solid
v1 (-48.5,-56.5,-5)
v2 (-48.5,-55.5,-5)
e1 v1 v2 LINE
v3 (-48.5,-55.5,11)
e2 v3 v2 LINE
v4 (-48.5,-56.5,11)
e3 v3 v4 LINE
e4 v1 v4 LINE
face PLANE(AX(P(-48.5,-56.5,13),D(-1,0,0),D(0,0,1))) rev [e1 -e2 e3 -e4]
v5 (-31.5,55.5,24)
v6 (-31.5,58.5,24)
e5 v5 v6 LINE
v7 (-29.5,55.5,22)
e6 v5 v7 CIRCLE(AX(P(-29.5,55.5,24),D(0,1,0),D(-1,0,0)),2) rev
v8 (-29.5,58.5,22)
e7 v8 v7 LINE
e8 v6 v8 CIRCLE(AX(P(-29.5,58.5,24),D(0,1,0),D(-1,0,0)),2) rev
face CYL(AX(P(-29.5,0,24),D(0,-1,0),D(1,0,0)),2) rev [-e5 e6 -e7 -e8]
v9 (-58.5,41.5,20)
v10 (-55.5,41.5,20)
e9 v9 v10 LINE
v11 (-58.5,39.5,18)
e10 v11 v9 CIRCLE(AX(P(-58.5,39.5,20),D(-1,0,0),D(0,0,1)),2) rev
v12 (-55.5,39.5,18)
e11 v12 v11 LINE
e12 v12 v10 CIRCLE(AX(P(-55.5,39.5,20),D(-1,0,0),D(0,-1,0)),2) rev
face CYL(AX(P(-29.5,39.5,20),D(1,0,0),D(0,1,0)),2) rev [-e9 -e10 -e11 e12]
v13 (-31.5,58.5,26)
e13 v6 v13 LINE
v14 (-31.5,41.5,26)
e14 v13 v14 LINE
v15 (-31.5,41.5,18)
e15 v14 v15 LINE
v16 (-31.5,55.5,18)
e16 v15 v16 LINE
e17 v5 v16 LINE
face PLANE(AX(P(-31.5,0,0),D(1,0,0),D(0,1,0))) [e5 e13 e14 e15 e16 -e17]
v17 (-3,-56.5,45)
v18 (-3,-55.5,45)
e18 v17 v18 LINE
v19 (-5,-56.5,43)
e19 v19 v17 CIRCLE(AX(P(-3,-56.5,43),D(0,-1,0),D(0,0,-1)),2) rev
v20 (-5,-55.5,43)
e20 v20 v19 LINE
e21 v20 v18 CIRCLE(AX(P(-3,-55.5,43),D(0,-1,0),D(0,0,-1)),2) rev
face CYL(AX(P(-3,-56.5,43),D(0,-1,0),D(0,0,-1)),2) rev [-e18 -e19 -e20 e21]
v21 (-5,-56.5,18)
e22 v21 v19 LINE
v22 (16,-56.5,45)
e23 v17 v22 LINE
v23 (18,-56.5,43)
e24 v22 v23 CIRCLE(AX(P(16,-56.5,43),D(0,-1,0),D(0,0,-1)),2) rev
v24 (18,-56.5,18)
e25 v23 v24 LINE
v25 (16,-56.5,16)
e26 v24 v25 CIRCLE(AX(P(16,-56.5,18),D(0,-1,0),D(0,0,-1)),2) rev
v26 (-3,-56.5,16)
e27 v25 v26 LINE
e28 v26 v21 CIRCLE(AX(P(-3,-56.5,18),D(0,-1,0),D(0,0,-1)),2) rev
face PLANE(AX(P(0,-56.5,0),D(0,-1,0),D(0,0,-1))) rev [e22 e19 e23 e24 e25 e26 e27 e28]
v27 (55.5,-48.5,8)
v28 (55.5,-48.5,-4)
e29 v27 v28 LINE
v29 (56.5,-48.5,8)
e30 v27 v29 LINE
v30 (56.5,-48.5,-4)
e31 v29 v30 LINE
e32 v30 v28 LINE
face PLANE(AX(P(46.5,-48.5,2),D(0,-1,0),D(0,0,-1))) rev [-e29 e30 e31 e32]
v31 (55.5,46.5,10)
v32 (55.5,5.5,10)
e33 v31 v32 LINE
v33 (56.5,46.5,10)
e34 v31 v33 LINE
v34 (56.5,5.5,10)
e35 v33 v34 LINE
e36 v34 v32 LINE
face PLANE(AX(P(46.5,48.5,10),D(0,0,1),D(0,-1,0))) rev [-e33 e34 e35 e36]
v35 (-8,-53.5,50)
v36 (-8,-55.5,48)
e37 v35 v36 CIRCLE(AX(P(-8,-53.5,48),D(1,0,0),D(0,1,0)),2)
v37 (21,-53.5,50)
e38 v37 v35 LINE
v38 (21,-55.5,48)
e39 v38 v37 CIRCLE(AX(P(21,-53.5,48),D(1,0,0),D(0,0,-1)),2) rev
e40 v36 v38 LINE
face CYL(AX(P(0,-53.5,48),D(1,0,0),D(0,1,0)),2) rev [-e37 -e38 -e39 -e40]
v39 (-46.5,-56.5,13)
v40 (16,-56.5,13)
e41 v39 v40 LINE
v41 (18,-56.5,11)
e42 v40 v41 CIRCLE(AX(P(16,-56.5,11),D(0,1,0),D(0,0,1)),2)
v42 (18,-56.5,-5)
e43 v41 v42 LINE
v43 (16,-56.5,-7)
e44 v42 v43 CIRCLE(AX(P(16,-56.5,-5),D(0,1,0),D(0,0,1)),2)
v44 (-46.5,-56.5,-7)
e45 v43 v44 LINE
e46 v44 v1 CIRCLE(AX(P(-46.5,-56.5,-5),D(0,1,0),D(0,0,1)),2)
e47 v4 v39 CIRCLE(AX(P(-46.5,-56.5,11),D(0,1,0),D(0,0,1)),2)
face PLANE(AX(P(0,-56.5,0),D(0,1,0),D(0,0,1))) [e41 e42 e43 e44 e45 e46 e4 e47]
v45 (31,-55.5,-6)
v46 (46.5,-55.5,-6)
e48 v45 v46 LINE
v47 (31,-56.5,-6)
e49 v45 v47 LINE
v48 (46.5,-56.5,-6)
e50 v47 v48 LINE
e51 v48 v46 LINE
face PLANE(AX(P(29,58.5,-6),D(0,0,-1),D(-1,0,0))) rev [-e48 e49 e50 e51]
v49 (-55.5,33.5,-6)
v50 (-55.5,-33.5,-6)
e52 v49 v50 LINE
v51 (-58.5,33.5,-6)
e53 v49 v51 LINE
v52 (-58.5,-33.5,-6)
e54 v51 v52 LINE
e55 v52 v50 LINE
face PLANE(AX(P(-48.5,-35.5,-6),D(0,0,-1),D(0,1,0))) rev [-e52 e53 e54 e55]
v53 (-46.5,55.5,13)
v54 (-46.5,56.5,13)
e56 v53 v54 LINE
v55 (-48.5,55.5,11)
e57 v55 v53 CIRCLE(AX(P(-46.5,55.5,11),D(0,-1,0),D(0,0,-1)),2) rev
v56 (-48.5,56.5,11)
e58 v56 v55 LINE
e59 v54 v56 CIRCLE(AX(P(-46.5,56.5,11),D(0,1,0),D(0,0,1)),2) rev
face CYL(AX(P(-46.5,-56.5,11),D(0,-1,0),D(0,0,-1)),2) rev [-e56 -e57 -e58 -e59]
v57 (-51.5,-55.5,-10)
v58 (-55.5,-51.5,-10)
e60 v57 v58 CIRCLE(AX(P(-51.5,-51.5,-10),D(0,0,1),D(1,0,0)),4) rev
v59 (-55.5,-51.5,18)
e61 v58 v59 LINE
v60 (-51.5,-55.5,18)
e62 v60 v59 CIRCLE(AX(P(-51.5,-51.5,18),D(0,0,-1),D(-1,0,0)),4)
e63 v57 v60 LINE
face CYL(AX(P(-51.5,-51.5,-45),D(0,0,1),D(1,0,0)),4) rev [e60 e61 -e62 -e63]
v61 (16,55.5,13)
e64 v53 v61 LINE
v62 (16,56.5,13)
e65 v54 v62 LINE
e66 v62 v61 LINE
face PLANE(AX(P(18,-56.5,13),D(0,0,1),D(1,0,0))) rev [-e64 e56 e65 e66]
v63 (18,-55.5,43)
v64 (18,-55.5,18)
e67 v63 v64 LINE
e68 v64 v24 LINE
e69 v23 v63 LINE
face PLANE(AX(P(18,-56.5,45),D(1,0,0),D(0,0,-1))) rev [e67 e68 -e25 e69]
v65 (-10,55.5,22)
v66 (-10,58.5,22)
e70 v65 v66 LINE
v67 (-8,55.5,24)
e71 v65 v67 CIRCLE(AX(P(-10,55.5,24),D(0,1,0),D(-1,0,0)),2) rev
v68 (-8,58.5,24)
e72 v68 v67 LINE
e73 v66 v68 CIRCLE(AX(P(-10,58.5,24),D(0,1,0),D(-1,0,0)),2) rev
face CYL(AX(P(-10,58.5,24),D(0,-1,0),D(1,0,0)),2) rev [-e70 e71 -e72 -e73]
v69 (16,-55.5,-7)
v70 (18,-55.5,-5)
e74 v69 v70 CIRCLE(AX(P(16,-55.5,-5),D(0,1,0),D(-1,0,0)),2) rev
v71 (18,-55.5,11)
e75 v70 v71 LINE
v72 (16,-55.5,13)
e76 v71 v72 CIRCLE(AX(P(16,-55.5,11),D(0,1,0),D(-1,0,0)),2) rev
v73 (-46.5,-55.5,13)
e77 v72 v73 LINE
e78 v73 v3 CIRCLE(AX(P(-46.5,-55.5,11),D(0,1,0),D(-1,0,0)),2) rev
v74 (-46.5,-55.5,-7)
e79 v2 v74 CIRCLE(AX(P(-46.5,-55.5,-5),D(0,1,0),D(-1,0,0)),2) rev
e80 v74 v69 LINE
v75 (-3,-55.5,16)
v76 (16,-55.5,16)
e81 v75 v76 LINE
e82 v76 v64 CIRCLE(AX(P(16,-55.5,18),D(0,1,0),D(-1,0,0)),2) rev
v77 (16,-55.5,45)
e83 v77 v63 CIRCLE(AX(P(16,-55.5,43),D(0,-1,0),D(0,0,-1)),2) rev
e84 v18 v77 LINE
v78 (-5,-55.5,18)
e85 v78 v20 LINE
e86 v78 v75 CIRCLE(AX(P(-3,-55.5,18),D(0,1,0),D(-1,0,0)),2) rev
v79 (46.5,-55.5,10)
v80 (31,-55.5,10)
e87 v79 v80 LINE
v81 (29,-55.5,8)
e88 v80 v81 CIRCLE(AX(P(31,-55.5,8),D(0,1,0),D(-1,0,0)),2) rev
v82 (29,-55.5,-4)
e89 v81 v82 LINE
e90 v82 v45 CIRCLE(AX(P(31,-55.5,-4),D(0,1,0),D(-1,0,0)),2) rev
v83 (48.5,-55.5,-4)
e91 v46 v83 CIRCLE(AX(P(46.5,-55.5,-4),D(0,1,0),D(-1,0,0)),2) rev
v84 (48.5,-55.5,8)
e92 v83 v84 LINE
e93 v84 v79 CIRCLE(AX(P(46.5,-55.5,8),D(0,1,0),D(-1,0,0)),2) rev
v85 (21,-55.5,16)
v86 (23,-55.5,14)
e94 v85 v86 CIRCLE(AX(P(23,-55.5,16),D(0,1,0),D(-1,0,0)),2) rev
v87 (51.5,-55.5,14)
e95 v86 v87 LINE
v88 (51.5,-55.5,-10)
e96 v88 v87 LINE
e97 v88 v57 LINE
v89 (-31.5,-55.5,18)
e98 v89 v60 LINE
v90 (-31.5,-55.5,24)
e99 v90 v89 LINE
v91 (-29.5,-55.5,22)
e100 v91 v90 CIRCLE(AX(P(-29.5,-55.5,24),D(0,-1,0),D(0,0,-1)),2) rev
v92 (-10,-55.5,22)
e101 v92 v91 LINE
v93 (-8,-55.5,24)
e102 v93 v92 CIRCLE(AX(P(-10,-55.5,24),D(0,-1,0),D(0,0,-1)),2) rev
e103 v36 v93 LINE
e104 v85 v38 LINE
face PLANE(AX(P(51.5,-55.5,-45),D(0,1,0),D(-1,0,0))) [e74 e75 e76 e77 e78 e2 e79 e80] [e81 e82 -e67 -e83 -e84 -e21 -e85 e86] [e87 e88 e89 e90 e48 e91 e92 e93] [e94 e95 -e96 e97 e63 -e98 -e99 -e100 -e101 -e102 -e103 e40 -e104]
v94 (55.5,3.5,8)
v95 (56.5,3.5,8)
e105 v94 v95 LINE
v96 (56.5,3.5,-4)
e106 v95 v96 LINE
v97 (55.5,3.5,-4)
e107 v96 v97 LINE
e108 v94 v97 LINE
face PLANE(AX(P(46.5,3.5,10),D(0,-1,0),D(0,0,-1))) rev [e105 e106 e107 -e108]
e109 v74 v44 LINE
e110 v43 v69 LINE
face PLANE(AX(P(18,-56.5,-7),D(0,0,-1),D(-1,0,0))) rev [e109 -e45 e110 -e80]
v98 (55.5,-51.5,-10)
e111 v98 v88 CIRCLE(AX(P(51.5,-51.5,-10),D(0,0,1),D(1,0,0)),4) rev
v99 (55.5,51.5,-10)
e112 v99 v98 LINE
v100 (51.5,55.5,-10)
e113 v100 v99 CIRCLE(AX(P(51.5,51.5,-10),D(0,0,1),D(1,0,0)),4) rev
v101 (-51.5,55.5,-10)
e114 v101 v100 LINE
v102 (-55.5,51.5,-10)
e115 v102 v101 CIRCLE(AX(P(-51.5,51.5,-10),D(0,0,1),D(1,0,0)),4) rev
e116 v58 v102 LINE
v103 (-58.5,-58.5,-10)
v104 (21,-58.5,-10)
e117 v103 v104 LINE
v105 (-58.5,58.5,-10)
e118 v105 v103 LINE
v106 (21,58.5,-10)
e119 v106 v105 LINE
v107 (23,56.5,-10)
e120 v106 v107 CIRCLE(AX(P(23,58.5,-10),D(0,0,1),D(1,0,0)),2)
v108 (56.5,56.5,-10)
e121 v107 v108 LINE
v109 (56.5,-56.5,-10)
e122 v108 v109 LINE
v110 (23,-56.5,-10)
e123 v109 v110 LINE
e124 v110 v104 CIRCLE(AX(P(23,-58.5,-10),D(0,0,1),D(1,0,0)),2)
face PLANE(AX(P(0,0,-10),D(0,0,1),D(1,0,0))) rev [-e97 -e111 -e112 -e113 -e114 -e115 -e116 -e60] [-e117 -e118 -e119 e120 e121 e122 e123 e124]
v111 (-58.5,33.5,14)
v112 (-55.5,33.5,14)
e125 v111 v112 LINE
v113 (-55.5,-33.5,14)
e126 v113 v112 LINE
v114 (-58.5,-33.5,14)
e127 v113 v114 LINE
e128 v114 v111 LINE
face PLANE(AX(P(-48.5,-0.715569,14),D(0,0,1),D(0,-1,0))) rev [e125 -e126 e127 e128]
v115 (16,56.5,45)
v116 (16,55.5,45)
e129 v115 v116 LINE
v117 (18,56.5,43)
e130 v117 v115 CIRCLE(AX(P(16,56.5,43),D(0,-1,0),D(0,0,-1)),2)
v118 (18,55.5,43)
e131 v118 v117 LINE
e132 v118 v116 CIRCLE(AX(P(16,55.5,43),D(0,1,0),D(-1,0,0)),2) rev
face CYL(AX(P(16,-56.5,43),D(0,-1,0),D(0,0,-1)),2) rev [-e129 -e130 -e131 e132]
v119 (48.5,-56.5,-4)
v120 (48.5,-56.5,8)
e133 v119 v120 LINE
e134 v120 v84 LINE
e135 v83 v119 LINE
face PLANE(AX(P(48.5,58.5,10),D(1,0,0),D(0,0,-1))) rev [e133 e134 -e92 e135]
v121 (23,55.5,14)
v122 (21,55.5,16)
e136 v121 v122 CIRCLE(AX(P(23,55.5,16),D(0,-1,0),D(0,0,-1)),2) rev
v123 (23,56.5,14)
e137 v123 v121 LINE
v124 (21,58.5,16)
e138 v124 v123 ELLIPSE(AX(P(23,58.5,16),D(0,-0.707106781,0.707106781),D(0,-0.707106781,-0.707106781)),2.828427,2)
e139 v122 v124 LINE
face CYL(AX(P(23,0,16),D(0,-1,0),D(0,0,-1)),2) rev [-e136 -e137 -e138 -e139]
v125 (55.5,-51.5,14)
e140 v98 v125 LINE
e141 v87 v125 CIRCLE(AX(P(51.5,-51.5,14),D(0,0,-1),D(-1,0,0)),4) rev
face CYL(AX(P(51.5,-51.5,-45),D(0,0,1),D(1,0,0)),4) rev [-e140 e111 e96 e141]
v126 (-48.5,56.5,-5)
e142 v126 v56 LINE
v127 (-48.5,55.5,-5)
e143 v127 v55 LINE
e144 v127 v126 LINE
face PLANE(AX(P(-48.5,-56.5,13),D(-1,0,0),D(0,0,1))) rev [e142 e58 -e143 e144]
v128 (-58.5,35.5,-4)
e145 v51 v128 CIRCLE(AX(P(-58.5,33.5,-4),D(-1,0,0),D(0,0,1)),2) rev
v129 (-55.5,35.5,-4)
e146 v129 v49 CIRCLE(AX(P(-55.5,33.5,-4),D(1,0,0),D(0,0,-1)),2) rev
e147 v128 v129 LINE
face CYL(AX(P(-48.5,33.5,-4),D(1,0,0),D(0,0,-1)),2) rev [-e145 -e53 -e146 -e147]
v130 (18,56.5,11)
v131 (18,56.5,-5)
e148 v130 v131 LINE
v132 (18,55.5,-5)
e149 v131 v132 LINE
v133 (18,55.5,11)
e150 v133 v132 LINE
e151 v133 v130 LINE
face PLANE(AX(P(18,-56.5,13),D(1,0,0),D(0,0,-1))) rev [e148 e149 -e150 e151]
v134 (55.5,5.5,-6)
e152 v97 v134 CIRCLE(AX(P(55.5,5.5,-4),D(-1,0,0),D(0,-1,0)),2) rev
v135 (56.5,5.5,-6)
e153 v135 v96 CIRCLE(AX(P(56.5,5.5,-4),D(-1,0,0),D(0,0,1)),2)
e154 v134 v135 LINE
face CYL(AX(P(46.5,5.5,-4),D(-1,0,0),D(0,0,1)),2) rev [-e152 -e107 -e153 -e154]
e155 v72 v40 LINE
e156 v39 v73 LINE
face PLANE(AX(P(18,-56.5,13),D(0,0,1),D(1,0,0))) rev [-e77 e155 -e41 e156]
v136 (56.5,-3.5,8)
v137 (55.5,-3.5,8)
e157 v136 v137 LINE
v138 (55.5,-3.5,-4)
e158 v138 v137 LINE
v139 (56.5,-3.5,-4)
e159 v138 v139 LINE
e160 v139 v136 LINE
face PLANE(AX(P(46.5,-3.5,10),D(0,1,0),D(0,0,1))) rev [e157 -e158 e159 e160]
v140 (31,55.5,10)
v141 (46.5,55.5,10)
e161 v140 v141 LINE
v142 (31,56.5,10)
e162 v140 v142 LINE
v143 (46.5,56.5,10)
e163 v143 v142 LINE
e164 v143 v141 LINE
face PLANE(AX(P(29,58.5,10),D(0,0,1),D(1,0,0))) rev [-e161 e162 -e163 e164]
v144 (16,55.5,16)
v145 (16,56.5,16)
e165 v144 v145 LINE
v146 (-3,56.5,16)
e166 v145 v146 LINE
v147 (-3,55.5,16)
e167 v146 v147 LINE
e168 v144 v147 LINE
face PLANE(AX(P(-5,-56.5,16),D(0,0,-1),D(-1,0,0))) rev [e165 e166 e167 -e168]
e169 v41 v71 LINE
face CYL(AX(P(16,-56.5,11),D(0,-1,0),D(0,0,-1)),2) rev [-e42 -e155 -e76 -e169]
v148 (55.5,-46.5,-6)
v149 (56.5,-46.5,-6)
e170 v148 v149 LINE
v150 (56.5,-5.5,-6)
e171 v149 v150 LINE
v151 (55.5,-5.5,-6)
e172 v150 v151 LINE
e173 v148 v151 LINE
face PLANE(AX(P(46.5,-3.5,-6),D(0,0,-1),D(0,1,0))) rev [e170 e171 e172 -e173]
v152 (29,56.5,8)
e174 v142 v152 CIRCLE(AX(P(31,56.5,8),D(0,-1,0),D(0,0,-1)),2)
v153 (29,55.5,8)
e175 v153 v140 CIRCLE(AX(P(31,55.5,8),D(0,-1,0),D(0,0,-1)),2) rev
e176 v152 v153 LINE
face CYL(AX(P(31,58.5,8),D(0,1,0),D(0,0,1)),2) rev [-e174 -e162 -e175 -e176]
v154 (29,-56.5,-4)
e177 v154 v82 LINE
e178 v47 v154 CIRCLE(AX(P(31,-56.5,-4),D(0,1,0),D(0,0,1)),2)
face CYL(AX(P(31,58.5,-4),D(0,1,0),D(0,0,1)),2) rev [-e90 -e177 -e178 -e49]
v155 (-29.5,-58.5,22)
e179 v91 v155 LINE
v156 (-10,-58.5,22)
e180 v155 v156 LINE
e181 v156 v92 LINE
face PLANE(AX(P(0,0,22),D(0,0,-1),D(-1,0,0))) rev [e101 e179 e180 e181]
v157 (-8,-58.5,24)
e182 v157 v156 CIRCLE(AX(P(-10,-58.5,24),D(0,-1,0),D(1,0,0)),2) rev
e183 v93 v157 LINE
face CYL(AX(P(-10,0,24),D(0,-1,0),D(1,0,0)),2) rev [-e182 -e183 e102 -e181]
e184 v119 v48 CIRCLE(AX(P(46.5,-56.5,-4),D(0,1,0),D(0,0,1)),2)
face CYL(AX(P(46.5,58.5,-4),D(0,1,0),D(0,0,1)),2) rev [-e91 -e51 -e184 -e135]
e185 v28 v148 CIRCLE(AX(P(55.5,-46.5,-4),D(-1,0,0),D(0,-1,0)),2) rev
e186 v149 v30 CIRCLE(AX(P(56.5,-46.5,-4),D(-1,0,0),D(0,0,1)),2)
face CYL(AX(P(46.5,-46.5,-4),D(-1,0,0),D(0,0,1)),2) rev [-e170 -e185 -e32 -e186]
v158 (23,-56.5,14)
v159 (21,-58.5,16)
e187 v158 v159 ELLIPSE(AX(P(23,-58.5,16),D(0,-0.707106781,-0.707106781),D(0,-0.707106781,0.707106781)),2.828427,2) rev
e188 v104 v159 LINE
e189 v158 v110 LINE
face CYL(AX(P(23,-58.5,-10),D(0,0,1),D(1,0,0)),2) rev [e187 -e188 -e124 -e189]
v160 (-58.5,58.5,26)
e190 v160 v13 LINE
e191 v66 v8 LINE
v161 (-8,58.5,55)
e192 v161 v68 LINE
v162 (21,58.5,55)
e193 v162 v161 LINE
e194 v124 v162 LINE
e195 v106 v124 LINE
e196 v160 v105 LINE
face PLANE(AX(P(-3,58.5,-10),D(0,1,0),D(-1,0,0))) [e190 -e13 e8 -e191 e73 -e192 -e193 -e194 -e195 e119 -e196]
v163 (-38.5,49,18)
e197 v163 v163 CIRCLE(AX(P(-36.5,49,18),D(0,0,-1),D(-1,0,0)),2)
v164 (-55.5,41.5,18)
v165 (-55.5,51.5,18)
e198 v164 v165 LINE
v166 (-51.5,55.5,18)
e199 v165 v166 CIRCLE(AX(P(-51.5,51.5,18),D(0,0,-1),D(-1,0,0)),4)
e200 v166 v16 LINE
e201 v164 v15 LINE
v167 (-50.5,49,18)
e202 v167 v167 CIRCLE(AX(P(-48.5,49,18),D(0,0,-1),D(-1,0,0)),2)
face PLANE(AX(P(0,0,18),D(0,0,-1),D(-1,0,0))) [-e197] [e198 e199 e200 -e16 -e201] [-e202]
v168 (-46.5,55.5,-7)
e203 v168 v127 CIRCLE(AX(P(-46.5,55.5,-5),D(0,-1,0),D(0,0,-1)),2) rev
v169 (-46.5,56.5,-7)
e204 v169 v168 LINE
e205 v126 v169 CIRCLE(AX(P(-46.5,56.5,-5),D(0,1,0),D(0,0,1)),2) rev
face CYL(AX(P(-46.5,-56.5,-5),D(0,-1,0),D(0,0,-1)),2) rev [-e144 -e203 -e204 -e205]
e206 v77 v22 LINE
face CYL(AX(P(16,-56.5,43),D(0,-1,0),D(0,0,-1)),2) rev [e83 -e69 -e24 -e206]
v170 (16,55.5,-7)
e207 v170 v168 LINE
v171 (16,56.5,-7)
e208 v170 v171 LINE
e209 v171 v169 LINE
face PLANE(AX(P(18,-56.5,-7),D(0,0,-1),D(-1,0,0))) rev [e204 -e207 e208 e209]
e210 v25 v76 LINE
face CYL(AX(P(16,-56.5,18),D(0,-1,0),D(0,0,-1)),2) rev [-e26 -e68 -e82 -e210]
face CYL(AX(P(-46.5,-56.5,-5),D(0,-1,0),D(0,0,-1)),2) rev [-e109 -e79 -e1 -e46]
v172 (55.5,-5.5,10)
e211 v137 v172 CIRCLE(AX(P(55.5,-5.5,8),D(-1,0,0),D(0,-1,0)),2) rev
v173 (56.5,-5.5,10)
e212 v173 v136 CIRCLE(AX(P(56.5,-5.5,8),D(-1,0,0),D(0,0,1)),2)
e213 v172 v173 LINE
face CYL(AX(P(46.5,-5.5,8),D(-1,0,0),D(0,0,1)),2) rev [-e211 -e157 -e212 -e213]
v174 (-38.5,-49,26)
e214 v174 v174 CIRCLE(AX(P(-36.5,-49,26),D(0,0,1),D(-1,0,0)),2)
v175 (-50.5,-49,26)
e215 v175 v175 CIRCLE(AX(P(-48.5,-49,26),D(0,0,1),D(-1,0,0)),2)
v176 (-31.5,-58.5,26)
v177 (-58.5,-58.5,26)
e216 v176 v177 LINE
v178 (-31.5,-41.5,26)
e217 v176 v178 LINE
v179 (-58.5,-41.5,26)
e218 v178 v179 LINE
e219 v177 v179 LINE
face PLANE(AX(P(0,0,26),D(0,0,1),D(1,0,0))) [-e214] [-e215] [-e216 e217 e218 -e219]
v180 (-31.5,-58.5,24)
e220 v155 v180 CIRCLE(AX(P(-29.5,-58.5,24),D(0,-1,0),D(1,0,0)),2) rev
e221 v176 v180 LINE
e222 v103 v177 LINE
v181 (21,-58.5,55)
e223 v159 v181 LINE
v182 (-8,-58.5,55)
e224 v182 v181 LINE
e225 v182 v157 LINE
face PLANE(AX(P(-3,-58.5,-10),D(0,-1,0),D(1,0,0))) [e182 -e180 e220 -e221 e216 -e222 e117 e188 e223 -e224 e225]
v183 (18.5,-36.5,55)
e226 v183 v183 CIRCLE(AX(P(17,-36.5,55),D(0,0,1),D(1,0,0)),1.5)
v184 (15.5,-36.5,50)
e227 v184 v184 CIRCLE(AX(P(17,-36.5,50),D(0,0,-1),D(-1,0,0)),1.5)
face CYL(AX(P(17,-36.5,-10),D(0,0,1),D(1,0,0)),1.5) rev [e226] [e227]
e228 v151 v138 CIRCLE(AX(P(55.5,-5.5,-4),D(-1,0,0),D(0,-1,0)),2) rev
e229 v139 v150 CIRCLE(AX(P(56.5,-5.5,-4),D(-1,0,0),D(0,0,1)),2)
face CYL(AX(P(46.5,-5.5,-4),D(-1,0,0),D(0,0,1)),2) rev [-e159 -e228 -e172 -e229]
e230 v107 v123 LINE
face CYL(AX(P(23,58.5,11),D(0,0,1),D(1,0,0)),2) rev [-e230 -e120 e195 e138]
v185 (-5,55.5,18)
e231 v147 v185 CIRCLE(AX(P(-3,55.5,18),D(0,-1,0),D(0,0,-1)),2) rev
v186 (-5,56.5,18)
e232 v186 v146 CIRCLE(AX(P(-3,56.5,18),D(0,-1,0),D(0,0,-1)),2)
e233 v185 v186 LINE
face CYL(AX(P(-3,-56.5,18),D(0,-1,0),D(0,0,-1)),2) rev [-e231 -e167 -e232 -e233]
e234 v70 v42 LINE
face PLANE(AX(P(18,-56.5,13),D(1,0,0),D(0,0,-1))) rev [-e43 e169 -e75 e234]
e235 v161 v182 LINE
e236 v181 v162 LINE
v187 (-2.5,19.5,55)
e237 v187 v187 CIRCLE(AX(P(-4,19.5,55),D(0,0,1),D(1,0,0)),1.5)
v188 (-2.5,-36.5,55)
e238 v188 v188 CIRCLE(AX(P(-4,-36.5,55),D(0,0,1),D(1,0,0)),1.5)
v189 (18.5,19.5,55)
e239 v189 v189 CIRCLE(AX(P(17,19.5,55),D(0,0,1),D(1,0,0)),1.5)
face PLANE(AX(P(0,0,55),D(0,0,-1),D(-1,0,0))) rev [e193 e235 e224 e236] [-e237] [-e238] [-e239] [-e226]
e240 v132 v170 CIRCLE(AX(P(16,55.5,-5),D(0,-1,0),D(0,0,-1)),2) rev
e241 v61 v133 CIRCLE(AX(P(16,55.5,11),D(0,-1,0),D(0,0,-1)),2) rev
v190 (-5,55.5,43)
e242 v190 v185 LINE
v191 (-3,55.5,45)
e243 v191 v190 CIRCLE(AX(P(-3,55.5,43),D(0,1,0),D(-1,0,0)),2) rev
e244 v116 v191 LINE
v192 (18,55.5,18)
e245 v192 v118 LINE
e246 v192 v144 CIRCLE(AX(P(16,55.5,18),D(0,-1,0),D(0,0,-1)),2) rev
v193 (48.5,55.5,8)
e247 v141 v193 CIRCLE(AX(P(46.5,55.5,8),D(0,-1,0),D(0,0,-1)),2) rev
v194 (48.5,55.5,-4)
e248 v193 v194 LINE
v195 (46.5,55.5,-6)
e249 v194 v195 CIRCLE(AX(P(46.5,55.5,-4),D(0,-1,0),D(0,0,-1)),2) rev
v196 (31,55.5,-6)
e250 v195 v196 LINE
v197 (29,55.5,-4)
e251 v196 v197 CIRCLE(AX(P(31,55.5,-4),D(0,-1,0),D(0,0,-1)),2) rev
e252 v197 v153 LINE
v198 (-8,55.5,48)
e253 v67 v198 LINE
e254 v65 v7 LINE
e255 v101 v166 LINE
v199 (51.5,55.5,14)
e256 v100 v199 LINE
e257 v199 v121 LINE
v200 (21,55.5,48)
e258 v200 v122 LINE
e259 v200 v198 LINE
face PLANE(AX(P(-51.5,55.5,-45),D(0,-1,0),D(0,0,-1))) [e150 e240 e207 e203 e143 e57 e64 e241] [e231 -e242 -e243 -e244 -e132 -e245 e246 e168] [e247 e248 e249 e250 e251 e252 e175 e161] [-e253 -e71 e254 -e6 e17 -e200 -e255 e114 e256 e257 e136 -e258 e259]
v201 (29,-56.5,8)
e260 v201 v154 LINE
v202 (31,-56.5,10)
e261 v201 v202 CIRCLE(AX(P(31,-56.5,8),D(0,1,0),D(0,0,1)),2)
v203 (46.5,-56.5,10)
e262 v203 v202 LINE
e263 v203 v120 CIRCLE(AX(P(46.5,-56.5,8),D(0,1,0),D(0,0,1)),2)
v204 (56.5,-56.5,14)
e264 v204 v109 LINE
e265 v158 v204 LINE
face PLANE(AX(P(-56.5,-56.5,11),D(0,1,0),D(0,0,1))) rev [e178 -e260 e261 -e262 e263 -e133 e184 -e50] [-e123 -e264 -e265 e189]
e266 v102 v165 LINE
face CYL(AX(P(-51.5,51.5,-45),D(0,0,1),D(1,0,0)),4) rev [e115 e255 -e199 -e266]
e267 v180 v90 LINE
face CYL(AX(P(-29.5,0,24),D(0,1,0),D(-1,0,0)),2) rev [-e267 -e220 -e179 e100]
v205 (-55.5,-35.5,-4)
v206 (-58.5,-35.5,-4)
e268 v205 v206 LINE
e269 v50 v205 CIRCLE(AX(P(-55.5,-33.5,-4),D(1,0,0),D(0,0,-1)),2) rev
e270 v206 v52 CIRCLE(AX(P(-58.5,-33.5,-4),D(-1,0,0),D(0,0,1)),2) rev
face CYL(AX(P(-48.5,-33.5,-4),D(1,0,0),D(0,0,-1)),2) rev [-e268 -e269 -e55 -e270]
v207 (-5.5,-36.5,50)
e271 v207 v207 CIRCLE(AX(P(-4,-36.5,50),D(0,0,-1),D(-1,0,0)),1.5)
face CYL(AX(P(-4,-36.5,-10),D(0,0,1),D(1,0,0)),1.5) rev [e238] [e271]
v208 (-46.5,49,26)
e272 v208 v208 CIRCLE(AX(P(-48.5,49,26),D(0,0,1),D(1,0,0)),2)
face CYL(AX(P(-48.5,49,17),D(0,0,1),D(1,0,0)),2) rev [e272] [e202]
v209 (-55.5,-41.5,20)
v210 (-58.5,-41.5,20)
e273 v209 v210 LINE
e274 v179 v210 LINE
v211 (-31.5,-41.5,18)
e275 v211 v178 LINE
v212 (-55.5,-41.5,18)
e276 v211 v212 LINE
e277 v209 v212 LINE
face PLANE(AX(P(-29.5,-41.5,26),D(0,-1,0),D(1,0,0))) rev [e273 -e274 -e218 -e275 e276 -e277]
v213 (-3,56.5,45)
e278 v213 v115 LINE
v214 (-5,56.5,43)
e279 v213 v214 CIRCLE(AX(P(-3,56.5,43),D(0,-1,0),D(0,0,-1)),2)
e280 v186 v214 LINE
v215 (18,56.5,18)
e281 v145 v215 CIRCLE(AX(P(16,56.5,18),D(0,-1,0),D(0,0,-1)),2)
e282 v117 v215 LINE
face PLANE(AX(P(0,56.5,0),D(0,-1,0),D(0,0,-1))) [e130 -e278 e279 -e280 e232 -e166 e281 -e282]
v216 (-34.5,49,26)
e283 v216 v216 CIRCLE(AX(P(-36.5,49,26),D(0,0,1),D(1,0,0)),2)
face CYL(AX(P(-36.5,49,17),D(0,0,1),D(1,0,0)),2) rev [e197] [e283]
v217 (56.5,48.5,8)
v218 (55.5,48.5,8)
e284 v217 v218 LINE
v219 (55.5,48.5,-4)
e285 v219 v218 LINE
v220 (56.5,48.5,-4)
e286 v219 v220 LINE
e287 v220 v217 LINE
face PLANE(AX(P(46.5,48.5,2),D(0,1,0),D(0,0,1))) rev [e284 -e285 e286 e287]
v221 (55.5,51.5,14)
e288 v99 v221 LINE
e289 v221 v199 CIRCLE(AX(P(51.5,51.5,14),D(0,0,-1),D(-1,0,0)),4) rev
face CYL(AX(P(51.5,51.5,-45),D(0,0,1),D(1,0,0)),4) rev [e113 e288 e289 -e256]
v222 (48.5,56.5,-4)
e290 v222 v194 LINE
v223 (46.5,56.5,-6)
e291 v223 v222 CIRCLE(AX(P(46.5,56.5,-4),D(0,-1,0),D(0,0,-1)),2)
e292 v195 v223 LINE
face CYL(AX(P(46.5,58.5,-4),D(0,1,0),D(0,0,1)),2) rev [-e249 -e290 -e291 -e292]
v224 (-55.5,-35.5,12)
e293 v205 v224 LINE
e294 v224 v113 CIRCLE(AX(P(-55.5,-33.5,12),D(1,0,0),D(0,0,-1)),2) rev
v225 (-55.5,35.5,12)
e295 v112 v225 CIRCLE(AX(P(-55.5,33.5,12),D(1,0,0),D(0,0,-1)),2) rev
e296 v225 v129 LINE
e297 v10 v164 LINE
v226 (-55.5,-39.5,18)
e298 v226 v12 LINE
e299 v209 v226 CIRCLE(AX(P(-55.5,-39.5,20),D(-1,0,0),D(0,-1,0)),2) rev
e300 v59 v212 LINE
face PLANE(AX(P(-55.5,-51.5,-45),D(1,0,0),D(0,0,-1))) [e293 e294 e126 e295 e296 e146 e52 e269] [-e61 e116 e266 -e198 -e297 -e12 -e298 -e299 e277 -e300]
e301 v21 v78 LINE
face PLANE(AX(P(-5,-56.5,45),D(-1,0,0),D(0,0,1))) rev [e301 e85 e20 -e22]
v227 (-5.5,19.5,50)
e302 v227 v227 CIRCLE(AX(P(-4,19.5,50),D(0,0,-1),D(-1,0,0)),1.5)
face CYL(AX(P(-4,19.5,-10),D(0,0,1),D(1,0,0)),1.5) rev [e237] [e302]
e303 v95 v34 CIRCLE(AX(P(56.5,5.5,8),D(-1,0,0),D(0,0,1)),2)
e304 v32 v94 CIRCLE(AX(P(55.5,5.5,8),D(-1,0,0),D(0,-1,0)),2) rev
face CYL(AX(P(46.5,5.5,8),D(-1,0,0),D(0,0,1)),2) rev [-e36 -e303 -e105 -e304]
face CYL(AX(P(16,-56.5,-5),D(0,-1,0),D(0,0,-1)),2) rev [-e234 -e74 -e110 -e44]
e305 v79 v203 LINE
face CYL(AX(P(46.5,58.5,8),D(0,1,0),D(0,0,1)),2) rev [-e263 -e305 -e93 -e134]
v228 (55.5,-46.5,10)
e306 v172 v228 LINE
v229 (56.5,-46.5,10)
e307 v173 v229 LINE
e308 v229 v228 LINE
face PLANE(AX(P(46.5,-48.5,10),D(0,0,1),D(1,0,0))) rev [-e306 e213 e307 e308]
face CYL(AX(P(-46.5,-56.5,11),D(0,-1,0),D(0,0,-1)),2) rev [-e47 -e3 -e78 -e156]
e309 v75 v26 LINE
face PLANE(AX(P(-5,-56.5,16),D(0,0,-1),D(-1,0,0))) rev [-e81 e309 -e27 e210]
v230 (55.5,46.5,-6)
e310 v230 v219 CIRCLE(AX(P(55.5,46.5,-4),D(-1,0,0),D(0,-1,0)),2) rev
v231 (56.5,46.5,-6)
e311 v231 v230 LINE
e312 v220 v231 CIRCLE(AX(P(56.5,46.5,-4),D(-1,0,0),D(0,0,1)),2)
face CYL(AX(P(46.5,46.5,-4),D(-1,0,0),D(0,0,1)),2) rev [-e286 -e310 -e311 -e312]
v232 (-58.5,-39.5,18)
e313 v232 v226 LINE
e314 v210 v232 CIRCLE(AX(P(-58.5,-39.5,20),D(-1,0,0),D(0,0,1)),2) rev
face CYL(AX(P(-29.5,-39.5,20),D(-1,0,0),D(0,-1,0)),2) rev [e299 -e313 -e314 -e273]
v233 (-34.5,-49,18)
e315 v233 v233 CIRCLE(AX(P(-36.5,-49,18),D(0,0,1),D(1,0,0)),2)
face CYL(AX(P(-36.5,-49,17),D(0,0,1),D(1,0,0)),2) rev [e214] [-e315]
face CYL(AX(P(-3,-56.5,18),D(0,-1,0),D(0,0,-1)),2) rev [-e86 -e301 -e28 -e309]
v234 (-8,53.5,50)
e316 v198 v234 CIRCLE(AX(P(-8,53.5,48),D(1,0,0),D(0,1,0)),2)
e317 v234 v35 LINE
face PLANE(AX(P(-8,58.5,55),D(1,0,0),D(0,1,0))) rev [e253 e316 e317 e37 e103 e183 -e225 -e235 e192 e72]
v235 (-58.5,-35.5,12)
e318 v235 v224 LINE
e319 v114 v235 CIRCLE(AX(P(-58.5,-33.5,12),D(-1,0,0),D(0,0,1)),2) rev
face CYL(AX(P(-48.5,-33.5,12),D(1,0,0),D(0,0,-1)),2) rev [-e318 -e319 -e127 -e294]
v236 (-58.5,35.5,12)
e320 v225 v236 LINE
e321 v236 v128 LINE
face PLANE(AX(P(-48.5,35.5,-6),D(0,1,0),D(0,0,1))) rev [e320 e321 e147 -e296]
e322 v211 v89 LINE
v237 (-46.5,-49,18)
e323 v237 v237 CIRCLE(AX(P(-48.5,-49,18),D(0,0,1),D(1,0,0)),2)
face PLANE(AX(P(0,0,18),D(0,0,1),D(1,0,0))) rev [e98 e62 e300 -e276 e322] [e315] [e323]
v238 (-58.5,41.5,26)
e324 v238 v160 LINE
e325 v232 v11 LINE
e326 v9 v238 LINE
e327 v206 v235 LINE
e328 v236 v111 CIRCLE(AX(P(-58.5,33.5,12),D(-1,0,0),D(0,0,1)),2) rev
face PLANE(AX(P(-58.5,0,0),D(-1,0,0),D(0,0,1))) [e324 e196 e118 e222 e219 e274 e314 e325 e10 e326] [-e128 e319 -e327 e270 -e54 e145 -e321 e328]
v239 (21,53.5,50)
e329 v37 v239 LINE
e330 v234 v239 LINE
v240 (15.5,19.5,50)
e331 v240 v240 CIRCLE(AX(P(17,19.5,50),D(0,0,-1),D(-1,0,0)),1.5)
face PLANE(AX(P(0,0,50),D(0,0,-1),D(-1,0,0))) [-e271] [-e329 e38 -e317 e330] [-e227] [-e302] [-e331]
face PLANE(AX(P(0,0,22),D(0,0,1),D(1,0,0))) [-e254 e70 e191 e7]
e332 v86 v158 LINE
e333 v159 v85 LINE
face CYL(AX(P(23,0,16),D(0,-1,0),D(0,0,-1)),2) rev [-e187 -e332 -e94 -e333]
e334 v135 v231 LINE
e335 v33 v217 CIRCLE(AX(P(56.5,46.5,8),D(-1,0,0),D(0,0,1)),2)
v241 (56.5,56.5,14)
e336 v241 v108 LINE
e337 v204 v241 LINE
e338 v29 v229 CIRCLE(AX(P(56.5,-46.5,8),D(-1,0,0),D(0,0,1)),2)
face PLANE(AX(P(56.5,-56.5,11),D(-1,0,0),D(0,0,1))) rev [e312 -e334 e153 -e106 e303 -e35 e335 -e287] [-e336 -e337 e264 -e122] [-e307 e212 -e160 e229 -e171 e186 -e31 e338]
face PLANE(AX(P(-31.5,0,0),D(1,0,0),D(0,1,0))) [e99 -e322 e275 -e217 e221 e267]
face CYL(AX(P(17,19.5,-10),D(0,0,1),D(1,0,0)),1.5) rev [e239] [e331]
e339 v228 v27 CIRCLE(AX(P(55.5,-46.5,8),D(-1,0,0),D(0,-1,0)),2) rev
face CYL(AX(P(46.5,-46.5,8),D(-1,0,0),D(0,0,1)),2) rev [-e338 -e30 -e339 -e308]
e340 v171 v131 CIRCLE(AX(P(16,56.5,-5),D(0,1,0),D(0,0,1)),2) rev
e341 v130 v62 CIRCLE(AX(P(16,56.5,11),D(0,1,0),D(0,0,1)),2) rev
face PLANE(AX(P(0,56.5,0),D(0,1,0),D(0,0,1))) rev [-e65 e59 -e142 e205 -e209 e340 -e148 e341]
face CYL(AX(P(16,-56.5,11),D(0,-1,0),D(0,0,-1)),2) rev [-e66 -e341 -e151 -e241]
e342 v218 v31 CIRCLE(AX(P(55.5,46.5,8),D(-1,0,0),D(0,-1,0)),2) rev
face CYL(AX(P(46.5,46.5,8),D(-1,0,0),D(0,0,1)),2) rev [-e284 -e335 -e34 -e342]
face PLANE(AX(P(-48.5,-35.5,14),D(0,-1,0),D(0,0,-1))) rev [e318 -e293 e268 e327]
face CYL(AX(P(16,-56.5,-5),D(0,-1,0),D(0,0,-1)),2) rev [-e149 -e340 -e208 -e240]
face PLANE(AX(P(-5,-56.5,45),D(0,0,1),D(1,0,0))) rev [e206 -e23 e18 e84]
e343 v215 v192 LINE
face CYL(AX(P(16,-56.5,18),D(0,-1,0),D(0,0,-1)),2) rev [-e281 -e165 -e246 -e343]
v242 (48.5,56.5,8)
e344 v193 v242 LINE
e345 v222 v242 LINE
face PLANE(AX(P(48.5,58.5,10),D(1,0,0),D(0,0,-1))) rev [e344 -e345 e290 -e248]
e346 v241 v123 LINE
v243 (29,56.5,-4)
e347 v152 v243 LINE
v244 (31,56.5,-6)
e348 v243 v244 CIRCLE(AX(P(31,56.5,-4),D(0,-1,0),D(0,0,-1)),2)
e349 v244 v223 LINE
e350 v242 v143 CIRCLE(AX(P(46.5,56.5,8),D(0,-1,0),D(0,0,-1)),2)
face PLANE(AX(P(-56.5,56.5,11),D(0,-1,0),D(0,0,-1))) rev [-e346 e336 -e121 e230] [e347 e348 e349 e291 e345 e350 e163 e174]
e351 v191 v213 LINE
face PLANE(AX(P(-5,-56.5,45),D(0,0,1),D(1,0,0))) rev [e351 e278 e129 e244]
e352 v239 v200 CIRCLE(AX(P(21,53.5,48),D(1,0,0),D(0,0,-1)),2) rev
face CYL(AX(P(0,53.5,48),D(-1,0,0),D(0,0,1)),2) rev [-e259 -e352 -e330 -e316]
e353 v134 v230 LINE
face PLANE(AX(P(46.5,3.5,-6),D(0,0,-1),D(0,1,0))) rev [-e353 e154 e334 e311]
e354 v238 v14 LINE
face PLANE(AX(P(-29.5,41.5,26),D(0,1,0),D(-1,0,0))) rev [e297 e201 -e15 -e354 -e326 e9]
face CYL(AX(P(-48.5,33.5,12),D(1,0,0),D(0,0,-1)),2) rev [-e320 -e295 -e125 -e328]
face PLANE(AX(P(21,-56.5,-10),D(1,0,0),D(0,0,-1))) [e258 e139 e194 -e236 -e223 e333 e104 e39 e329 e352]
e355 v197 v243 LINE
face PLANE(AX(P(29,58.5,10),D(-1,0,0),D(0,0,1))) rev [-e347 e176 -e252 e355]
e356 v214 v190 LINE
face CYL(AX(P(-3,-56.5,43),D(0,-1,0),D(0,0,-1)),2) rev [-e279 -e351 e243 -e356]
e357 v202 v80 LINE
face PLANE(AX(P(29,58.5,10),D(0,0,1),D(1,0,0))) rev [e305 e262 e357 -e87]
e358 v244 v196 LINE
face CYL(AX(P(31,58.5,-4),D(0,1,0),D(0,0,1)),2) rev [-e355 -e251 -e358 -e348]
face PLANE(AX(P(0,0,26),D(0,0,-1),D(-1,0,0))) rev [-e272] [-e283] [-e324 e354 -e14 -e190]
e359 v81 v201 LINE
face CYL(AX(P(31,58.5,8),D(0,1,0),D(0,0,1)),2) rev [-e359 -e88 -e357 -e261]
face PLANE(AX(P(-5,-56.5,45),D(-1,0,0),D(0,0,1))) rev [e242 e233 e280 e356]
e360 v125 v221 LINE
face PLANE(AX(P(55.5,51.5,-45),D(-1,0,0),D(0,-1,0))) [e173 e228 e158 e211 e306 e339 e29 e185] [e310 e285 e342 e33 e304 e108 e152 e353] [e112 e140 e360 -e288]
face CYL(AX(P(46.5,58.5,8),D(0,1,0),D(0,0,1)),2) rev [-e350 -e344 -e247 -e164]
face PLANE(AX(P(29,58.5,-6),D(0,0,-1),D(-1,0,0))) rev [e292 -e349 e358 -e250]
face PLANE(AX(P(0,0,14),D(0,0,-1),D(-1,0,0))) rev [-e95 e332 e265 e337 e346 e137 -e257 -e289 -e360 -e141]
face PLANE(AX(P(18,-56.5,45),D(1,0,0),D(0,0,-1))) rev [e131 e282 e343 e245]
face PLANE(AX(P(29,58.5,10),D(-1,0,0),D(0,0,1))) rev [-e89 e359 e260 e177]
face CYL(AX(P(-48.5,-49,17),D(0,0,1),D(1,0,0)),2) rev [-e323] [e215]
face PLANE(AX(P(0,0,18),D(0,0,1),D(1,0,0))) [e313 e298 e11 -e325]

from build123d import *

# Parameters (mm, degrees)
SKETCH2_W                          = 113
SKETCH2_H                          = 113
SKETCH2_W_2                        = 107
SKETCH2_H_2                        = 107
BOSS_EXTRUDE1_DEPTH                = 11
SKETCH3_W                          = 40
SKETCH3_H                          = 30
BOSS_EXTRUDE2_DEPTH                = 2
BOSS_EXTRUDE5_DEPTH                = 50
BOSS_EXTRUDE5_DEPTH_BACK           = 10
SKETCH6_W                          = 24
SKETCH6_H                          = 2
BOSS_EXTRUDE6_DEPTH                = 5
BOSS_EXTRUDE7_DEPTH                = 4
SKETCH12_R                         = 1.5
CUT_EXTRUDE1_DEPTH                 = 131.228645082
SKETCH17_W                         = 110.474014848
SKETCH17_H                         = 62.958309537
REMOVAL_OF_BATTERY_EXTENSION_DEPTH = 141.257798357
SKETCH18_W                         = 113
SKETCH18_H                         = 113
SKETCH18_W_2                       = 107
SKETCH18_H_2                       = 107
EXTEND_WALLS_DEPTH                 = 10
BOSS_EXTRUDE10_REACH               = 96.438
SKETCH22_W                         = 24
SKETCH22_H                         = 3
BOSS_EXTRUDE11_DEPTH               = 7
SKETCH24_W                         = 27
SKETCH24_H                         = 15
BOSS_EXTRUDE12_DEPTH               = 8
SKETCH25_R                         = 2
CUT_EXTRUDE4_DEPTH                 = 9
BOSS_EXTRUDE13_DEPTH               = 2
BOSS_EXTRUDE14_DEPTH               = 2
SKETCH29_W                         = 26.5
SKETCH29_H                         = 5
BOSS_EXTRUDE15_DEPTH               = 4
BOSS_EXTRUDE16_DEPTH               = 2
BOSS_EXTRUDE17_REACH               = 104.198
SKETCH31_W                         = 5
SKETCH31_H                         = 5
CUT_EXTRUDE5_DEPTH                 = 4
SKETCH33_W                         = 29
SKETCH33_H                         = 4
CUT_EXTRUDE6_DEPTH                 = 110
CUT_EXTRUDE7_DEPTH                 = 10
SKETCH35_W                         = 19.5
SKETCH35_H                         = 16
CUT_EXTRUDE8_DEPTH                 = 141.257798357
SKETCH37_W                         = 4
SKETCH37_H                         = 117
CUT_EXTRUDE13_DEPTH                = 2
SKETCH38_W                         = 2
SKETCH38_H                         = 12
CUT_EXTRUDE14_DEPTH                = 10
FILLET1_R                          = 2
CUT_EXTRUDE15_DEPTH                = 10
FILLET2_R                          = 2
SKETCH40_W                         = 23
SKETCH40_H                         = 29
SKETCH40_W_2                       = 66.5
SKETCH40_H_2                       = 20
CUT_EXTRUDE16_DEPTH                = 56.5
FILLET3_R                          = 2
FILLET4_R                          = 2
CUT_EXTRUDE20_DEPTH                = 63
CUT_EXTRUDE21_DEPTH                = 32
FILLET6_R                          = 2


with BuildPart() as part:
    # Sketch2 → Boss-Extrude1 (new body)
    with BuildSketch(Plane.XY):
        Rectangle(SKETCH2_W, SKETCH2_H)
        Rectangle(SKETCH2_W_2, SKETCH2_H_2, mode=Mode.SUBTRACT)
    extrude(amount=BOSS_EXTRUDE1_DEPTH)

    # Sketch3 → Boss-Extrude2 (add)
    with BuildSketch(Plane.XY):
        with Locations((-76.5, 0)):
            Rectangle(SKETCH3_W, SKETCH3_H)
    extrude(amount=BOSS_EXTRUDE2_DEPTH)

    # Sketch6 → Boss-Extrude5 (add, two sides: drawn at the far end of the back side and taken through both)
    with BuildSketch(Plane.XY.offset(-BOSS_EXTRUDE5_DEPTH_BACK)):
        with Locations((9, -57.5)):
            Rectangle(SKETCH6_W, SKETCH6_H)
        with Locations((9, 57.5)):
            Rectangle(SKETCH6_W, SKETCH6_H)
    extrude(amount=BOSS_EXTRUDE5_DEPTH + BOSS_EXTRUDE5_DEPTH_BACK)

    # Sketch8 → Boss-Extrude6 (add)
    with BuildSketch(Plane.XY.offset(50)):
        Polygon((-3, 58.5), (-8, 58.5), (-8, -58.5), (-3, -58.5), (21, -58.5), (21, 58.5), align=None)
    extrude(amount=BOSS_EXTRUDE6_DEPTH)

    # Sketch9 → Boss-Extrude7 (add)
    with BuildSketch(Plane.XY.offset(55)):
        Polygon((-3, 58.5), (-8, 58.5), (-8, 43.5), (21, 43.5), (21, 54.5), (21, 56.5), (21, 58.5), align=None)
        Polygon((-3, -58.5), (21, -58.5), (21, -56.5), (21, -54.5), (21, -43.5), (-8, -43.5), (-8, -58.5), align=None)
    extrude(amount=BOSS_EXTRUDE7_DEPTH)

    # Sketch12 → Cut-Extrude1 (cut, through all)
    with BuildSketch(Plane.XY.offset(55)):
        with Locations((17, 19.5)):
            Circle(SKETCH12_R)
        with Locations((-4, 19.5)):
            Circle(SKETCH12_R)
        with Locations((17, -36.5)):
            Circle(SKETCH12_R)
        with Locations((-4, -36.5)):
            Circle(SKETCH12_R)
    extrude(amount=-CUT_EXTRUDE1_DEPTH, mode=Mode.SUBTRACT)

    # Sketch17 → removal of battery extension (cut, through all)
    with BuildSketch(Plane.ZY.offset(56.5)):
        with Locations((34.263645264, -0.593946317)):
            Rectangle(SKETCH17_W, SKETCH17_H)
    extrude(amount=REMOVAL_OF_BATTERY_EXTENSION_DEPTH, mode=Mode.SUBTRACT)

    # Sketch18 → Extend walls (add)
    with BuildSketch(Plane(origin=(0, 0, 0), x_dir=(-1, 0, 0), z_dir=(0, 0, -1))):
        Rectangle(SKETCH18_W, SKETCH18_H)
        Rectangle(SKETCH18_W_2, SKETCH18_H_2, mode=Mode.SUBTRACT)
    extrude(amount=EXTEND_WALLS_DEPTH)

    # Sketch22 → Boss-Extrude10 (add, up to next)
    with BuildSketch(Plane.XY.offset(11), mode=Mode.PRIVATE) as boss_extrude10_sk1:
        with Locations((9, 55)):
            Rectangle(SKETCH22_W, SKETCH22_H)
    boss_extrude10_tool1 = extrude(boss_extrude10_sk1.sketch, amount=BOSS_EXTRUDE10_REACH, mode=Mode.PRIVATE) - part.part
    # Sketch22 → Boss-Extrude10 (add, up to next)
    with BuildSketch(Plane.XY.offset(11), mode=Mode.PRIVATE) as boss_extrude10_sk2:
        with Locations((9, -55)):
            Rectangle(SKETCH22_W, SKETCH22_H)
    boss_extrude10_tool2 = extrude(boss_extrude10_sk2.sketch, amount=BOSS_EXTRUDE10_REACH, mode=Mode.PRIVATE) - part.part
    add(boss_extrude10_tool1.solids().sort_by_distance((9, 55, 11))[0])
    add(boss_extrude10_tool2.solids().sort_by_distance((9, -55, 11))[0])

    # Sketch23 → Boss-Extrude11 (add)
    with BuildSketch(Plane.XY.offset(11)):
        Polygon((21, -56.5), (21, -53.5), (53.5, -53.5), (53.5, 53.5), (21, 53.5), (21, 56.5), (56.5, 56.5), (56.5, -56.5), align=None)
        Polygon((-3, 53.5), (-3, 56.5), (-56.5, 56.5), (-56.5, -56.5), (-3, -56.5), (-3, -53.5), (-53.5, -53.5), (-53.5, 53.5), align=None)
    extrude(amount=BOSS_EXTRUDE11_DEPTH)

    # Sketch24 → Boss-Extrude12 (add)
    with BuildSketch(Plane.XY.offset(18)):
        with Locations((-43, 49)):
            Rectangle(SKETCH24_W, SKETCH24_H)
        with Locations((-43, -49)):
            Rectangle(SKETCH24_W, SKETCH24_H)
    extrude(amount=BOSS_EXTRUDE12_DEPTH)

    # Sketch25 → Cut-Extrude4 (cut)
    with BuildSketch(Plane.XY.offset(26)):
        with Locations((-48.5, 49)):
            Circle(SKETCH25_R)
        with Locations((-36.5, 49)):
            Circle(SKETCH25_R)
        with Locations((-48.5, -49)):
            Circle(SKETCH25_R)
        with Locations((-36.5, -49)):
            Circle(SKETCH25_R)
    extrude(amount=-CUT_EXTRUDE4_DEPTH, mode=Mode.SUBTRACT)

    # Sketch27 → Boss-Extrude13 (add)
    with BuildSketch(Plane(origin=(0, 56.5, 0), x_dir=(1, 0, 0), z_dir=(0, 1, 0))):
        Polygon((-29.5, -26), (-29.5, -18), (-3, -18), (-3, 10), (-56.5, 10), (-56.5, -26), align=None)
    extrude(amount=BOSS_EXTRUDE13_DEPTH)

    # Sketch28 → Boss-Extrude14 (add)
    with BuildSketch(Plane.XZ.offset(56.5)):
        Polygon((-56.5, 26), (-56.5, -10), (-3, -10), (-3, 18), (-29.5, 18), (-29.5, 26), align=None)
    extrude(amount=BOSS_EXTRUDE14_DEPTH)

    # Sketch29 → Boss-Extrude15 (add)
    with BuildSketch(Plane.XY.offset(18)):
        with Locations((-16.25, 56)):
            Rectangle(SKETCH29_W, SKETCH29_H)
        with Locations((-16.25, -56)):
            Rectangle(SKETCH29_W, SKETCH29_H)
    extrude(amount=BOSS_EXTRUDE15_DEPTH)

    # Sketch30 → Boss-Extrude16 (add)
    with BuildSketch(Plane.ZY.offset(56.5)):
        Polygon((26, 58.5), (-10, 58.5), (-10, -58.5), (26, -58.5), (26, -41.5), (18, -41.5), (18, 41.5), (26, 41.5), align=None)
    extrude(amount=BOSS_EXTRUDE16_DEPTH)

    # Sketch31 → Boss-Extrude17 (add, up to next)
    with BuildSketch(Plane(origin=(0, 0, 50), x_dir=(-1, 0, 0), z_dir=(0, 0, -1)), mode=Mode.PRIVATE) as boss_extrude17_sk1:
        with Locations((5.5, 56)):
            Rectangle(SKETCH31_W, SKETCH31_H)
    boss_extrude17_tool1 = extrude(boss_extrude17_sk1.sketch, amount=BOSS_EXTRUDE17_REACH, mode=Mode.PRIVATE) - part.part
    # Sketch31 → Boss-Extrude17 (add, up to next)
    with BuildSketch(Plane(origin=(0, 0, 50), x_dir=(-1, 0, 0), z_dir=(0, 0, -1)), mode=Mode.PRIVATE) as boss_extrude17_sk2:
        with Locations((5.5, -56)):
            Rectangle(SKETCH31_W, SKETCH31_H)
    boss_extrude17_tool2 = extrude(boss_extrude17_sk2.sketch, amount=BOSS_EXTRUDE17_REACH, mode=Mode.PRIVATE) - part.part
    add(boss_extrude17_tool1.solids().sort_by_distance((-5.5, 56, 50))[0])
    add(boss_extrude17_tool2.solids().sort_by_distance((-5.5, -56, 50))[0])

    # Sketch32 → Cut-Extrude5 (cut)
    with BuildSketch(Plane.XY.offset(18)):
        Polygon((21, -56.5), (21, -53.5), (53.5, -53.5), (53.5, 53.5), (21, 53.5), (21, 56.5), (56.5, 56.5), (56.5, -56.5), align=None)
    extrude(amount=-CUT_EXTRUDE5_DEPTH, mode=Mode.SUBTRACT)

    # Sketch33 → Cut-Extrude6 (cut, symmetric)
    with BuildSketch(Plane(origin=(0, -43.5, 0), x_dir=(1, 0, 0), z_dir=(0, 1, 0))):
        with Locations((6.5, -57)):
            Rectangle(SKETCH33_W, SKETCH33_H)
    extrude(amount=CUT_EXTRUDE6_DEPTH, both=True, mode=Mode.SUBTRACT)

    # Sketch34 → Cut-Extrude7 (cut)
    with BuildSketch(Plane(origin=(56.5, 0, 0), x_dir=(0, 0, -1), z_dir=(1, 0, 0))):
        Polygon((-2, -48.5), (-10, -48.5), (-10, -3.5), (6, -3.5), (6, -48.5), align=None)
        Polygon((6, 3.5), (6, 48.5), (-2, 48.5), (-10, 48.5), (-10, 3.5), align=None)
    extrude(amount=-CUT_EXTRUDE7_DEPTH, mode=Mode.SUBTRACT)

    # Sketch35 → Cut-Extrude8 (cut, through all)
    with BuildSketch(Plane.XZ.offset(56.5)):
        with Locations((38.75, 2)):
            Rectangle(SKETCH35_W, SKETCH35_H)
    extrude(amount=-CUT_EXTRUDE8_DEPTH, mode=Mode.SUBTRACT)

    # Sketch37 → Cut-Extrude13 (cut)
    with BuildSketch(Plane(origin=(-29.5, 0, 0), x_dir=(0, 0, -1), z_dir=(1, 0, 0))):
        with Locations((-24, 0)):
            Rectangle(SKETCH37_W, SKETCH37_H)
    extrude(amount=-CUT_EXTRUDE13_DEPTH, mode=Mode.SUBTRACT)

    # Sketch38 → Cut-Extrude14 (cut)
    with BuildSketch(Plane.XY.offset(22)):
        with Locations((-30.5, -47.5)):
            Rectangle(SKETCH38_W, SKETCH38_H)
        with Locations((-30.5, 47.5)):
            Rectangle(SKETCH38_W, SKETCH38_H)
    extrude(amount=-CUT_EXTRUDE14_DEPTH, mode=Mode.SUBTRACT)

    # Fillet1
    fillet1_edges = [part.edges().sort_by_distance(p)[0] for p in [
        (-42.5, 53.5, 18),
        (-42.5, -53.5, 18),
        (-56, -41.5, 18),
        (-56, 41.5, 18),
        (-31.5, 53.5, 20),
        (-31.5, 56, 22),
        (-8, 56, 22),
        (-31.5, -53.5, 20),
        (-31.5, -56, 22),
        (-8, -56, 22),
        (-53.5, -53.5, 4),
        (-53.5, 53.5, 4),
        (53.5, 53.5, 2),
        (53.5, -53.5, 2),
        (48.5, -55, 10),
        (48.5, -55, -6),
        (29, -55, 10),
        (29, -55, -6),
        (55, -48.5, -6),
        (55, -3.5, -6),
        (55, -3.5, 10),
        (55, -48.5, 10),
        (55, 3.5, 10),
        (55, 3.5, -6),
        (55, 48.5, 10),
        (55, 48.5, -6),
        (29, 55, -6),
        (48.5, 55, -6),
        (48.5, 55, 10),
        (29, 55, 10),
        (21, 56.5, 2),
        (21, 55, 14),
        (21, -56.5, 2),
        (21, -55, 14),
        (6.5, 53.5, 50),
        (6.5, -53.5, 50),
    ]]
    fillet(fillet1_edges, radius=FILLET1_R - 0.0001)  # a hair under: the kernel refuses the full size

    # Sketch39 → Cut-Extrude15 (cut)
    with BuildSketch(Plane.ZY.offset(58.5)):
        Polygon((14, -0.715568725), (14, -35.5), (-6, -35.5), (-6, 35.5), (14, 35.5), align=None)
    extrude(amount=-CUT_EXTRUDE15_DEPTH, mode=Mode.SUBTRACT)

    # Fillet2
    fillet2_edges = [part.edges().sort_by_distance(p)[0] for p in [
        (-56, 35.5, 14),
        (-56, -35.5, 14),
        (-56, -35.5, -6),
        (-56, 35.5, -6),
    ]]
    fillet(fillet2_edges, radius=FILLET2_R)

    # Sketch40 → Cut-Extrude16 (cut, symmetric)
    with BuildSketch(Plane(origin=(0, 0, 0), x_dir=(1, 0, 0), z_dir=(0, 1, 0))):
        with Locations((6.5, -30.5)):
            Rectangle(SKETCH40_W, SKETCH40_H)
        with Locations((-15.25, -3)):
            Rectangle(SKETCH40_W_2, SKETCH40_H_2)
    extrude(amount=CUT_EXTRUDE16_DEPTH, both=True, mode=Mode.SUBTRACT)

    # Fillet3
    fillet3_edges = [part.edges().sort_by_distance(p)[0] for p in [
        (18, 55, 45),
        (-5, 55, 45),
        (-5, 55, 16),
        (18, -55, 16),
        (18, -55, 45),
        (-5, -55, 45),
        (-5, -55, 16),
        (-48.5, 55, 13),
        (-48.5, 55, -7),
        (18, 55, -7),
        (18, 55, 13),
        (-48.5, -55, 13),
        (-48.5, -55, -7),
        (18, -55, -7),
        (18, -55, 13),
    ]]
    fillet(fillet3_edges, radius=FILLET3_R)

    # Fillet4
    fillet4_edges = [part.edges().sort_by_distance(p)[0] for p in [
        (18, 55, 16),
    ]]
    fillet(fillet4_edges, radius=FILLET4_R)

    # Sketch42 → Cut-Extrude20 (cut)
    with BuildSketch(Plane(origin=(0, 0, 18), x_dir=(-1, 0, 0), z_dir=(0, 0, -1))):
        with BuildLine():
            Line((-55.5, 51.5), (-55.5, -51.5))
            ThreePointArc((-55.5, -51.5), (-54.328427125, -54.328427125), (-51.5, -55.5))
            Line((-51.5, -55.5), (51.5, -55.5))
            ThreePointArc((51.5, -55.5), (54.328427125, -54.328427125), (55.5, -51.5))
            Line((55.5, -51.5), (55.5, 51.5))
            ThreePointArc((55.5, 51.5), (54.328427125, 54.328427125), (51.5, 55.5))
            Line((51.5, 55.5), (-51.5, 55.5))
            ThreePointArc((-51.5, 55.5), (-54.328427125, 54.328427125), (-55.5, 51.5))
        make_face()
    extrude(amount=CUT_EXTRUDE20_DEPTH, mode=Mode.SUBTRACT)

    # Sketch44 → Cut-Extrude21 (cut)
    with BuildSketch(Plane(origin=(0, 0, 18), x_dir=(-1, 0, 0), z_dir=(0, 0, -1))):
        Polygon((55.5, 41.5), (55.5, -41.5), (31.5, -41.5), (31.5, -55.5), (-21, -55.5), (-21, 55.5), (31.5, 55.5), (31.5, 53.5), (31.5, 41.5), align=None)
    extrude(amount=-CUT_EXTRUDE21_DEPTH, mode=Mode.SUBTRACT)

    # Fillet6
    fillet6_edges = [part.edges().sort_by_distance(p)[0] for p in [
        (6.5, -55.5, 50),
        (6.5, 55.5, 50),
    ]]
    fillet(fillet6_edges, radius=FILLET6_R)


solid = part.part
